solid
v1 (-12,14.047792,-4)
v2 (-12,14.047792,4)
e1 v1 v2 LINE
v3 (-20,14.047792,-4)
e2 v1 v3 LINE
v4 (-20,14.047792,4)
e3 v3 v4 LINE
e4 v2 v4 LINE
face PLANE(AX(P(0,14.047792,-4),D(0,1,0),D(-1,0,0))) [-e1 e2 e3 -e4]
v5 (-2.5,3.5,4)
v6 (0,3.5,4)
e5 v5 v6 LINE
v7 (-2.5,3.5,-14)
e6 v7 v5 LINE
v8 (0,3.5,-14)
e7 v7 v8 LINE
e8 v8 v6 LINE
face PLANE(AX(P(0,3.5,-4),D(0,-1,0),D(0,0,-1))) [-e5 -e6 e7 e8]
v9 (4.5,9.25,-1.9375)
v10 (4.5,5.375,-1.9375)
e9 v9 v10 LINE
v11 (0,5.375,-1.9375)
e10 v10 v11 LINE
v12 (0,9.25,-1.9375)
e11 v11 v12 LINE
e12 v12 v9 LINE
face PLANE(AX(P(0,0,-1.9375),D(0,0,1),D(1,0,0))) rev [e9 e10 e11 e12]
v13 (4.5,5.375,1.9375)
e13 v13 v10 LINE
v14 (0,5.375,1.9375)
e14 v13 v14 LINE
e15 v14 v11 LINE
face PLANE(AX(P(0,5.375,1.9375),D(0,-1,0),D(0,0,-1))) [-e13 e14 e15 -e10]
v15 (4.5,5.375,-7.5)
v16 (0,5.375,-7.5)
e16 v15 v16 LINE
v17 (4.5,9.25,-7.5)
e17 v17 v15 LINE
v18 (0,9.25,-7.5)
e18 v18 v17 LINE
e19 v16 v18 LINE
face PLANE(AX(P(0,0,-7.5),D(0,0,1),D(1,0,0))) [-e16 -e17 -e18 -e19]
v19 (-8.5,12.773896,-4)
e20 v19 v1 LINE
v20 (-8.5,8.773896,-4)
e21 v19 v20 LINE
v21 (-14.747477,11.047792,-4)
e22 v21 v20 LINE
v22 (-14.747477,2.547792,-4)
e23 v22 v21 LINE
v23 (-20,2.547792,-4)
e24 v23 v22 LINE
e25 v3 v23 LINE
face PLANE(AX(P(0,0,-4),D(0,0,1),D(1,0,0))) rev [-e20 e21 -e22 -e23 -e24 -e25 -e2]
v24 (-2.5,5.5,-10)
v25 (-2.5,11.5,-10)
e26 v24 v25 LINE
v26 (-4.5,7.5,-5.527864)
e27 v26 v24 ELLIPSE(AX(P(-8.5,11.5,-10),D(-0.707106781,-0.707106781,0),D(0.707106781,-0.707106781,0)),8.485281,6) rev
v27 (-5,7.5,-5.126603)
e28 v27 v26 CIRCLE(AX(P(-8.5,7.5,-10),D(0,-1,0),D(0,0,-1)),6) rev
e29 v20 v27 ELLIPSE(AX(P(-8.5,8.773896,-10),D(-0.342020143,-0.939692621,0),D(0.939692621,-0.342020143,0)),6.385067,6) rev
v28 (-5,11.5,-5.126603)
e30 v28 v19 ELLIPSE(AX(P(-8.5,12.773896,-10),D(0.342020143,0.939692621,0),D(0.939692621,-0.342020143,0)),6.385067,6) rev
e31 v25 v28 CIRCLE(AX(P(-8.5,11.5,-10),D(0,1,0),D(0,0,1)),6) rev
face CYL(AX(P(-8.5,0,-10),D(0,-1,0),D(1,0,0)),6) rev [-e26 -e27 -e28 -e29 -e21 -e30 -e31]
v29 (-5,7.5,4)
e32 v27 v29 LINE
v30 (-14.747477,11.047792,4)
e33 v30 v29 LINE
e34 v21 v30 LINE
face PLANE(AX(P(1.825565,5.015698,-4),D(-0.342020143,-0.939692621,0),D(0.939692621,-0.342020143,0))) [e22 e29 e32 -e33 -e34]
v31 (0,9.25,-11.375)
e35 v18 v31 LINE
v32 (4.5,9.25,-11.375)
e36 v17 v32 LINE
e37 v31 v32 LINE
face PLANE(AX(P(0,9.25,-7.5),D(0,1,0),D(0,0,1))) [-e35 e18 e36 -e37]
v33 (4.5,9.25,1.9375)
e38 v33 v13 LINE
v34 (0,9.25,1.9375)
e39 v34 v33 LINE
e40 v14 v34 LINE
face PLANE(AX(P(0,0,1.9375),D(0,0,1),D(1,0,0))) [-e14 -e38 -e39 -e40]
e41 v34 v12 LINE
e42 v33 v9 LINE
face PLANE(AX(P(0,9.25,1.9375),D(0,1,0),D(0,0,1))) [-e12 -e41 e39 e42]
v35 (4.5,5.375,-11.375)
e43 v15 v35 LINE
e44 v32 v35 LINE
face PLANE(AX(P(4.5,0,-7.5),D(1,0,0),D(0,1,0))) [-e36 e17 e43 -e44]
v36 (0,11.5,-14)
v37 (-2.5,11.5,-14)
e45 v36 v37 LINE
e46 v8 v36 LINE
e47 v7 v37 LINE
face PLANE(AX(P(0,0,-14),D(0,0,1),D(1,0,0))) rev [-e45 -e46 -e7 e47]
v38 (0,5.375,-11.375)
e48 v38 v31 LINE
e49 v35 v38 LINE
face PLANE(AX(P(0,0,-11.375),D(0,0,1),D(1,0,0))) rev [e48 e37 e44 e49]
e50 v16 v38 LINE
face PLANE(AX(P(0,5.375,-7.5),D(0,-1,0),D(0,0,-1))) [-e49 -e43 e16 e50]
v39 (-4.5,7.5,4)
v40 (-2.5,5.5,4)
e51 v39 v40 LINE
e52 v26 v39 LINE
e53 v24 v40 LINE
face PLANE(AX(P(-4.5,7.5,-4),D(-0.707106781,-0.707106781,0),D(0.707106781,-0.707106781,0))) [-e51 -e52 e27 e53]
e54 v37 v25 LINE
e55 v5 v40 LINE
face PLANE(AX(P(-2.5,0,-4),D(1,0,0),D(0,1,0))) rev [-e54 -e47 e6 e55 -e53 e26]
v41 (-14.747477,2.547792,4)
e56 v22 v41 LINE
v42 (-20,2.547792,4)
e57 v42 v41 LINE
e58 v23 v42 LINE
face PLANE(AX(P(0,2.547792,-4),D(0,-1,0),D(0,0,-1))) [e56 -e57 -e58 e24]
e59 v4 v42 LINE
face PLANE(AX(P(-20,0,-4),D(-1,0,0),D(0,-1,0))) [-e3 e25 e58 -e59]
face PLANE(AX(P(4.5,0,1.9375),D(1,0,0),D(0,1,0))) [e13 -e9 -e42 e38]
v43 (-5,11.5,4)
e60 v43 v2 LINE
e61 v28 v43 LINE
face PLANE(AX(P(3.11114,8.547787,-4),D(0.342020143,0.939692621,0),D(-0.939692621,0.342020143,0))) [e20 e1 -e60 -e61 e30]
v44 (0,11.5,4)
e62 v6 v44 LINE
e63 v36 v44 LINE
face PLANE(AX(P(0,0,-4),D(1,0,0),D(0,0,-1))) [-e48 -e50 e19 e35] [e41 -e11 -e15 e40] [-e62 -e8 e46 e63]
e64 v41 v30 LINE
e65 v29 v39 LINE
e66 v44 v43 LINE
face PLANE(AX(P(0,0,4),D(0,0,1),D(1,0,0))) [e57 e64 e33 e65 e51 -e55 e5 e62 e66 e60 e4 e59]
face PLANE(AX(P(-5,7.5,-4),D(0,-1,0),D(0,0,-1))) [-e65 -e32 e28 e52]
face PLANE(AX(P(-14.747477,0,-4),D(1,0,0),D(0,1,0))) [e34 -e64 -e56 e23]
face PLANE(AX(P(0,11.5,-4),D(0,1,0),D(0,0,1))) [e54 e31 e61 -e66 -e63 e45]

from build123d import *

# Parameters (mm, degrees)
SKETCH1_W           = 5.252522581
SKETCH1_H           = 8.5
BOSS_EXTRUDE1_DEPTH = 4
BOSS_EXTRUDE4_DEPTH = 14
SKETCH1_3_W         = 4.5
SKETCH1_3_H         = 3.875
BOSS_EXTRUDE2_DEPTH = 1.9375
BOSS_EXTRUDE5_START = -11.375
SKETCH1_8_W         = 4.5
SKETCH1_8_H         = 3.875
BOSS_EXTRUDE5_DEPTH = 3.875
FILLET1_R           = 6


with BuildPart() as part:
    # Sketch1 → Boss-Extrude1 (new, symmetric)
    with BuildSketch(Plane.XY):
        Polygon((-5, 7.5), (-4.5, 7.5), (-2.5, 5.5), (-2.5, 3.5), (0, 3.5), (0, 11.5), (-5, 11.5), align=None)
        Polygon((-20, 11.04779164), (-14.747477419, 11.04779164), (-5, 7.5), (-5, 11.5), (-12, 14.04779164), (-20, 14.04779164), align=None)
        with Locations((-17.373738709, 6.79779164)):
            Rectangle(SKETCH1_W, SKETCH1_H)
    extrude(amount=BOSS_EXTRUDE1_DEPTH, both=True)

    # Sketch1<7> → Boss-Extrude4 (add)
    with BuildSketch(Plane.XY):
        Polygon((-2.5, 3.5), (0, 3.5), (0, 5.375), (0, 9.25), (0, 11.5), (-2.5, 11.5), (-2.5, 5.5), align=None)
    extrude(amount=-BOSS_EXTRUDE4_DEPTH)

    # Sketch1<3> → Boss-Extrude2 (add, symmetric)
    with BuildSketch(Plane.XY):
        with Locations((2.25, 7.3125)):
            Rectangle(SKETCH1_3_W, SKETCH1_3_H)
    extrude(amount=BOSS_EXTRUDE2_DEPTH, both=True)

    # Sketch1<8> → Boss-Extrude5 (add)
    with BuildSketch(Plane.XY.offset(BOSS_EXTRUDE5_START)):
        with Locations((2.25, 7.3125)):
            Rectangle(SKETCH1_8_W, SKETCH1_8_H)
    extrude(amount=BOSS_EXTRUDE5_DEPTH)

    # Fillet1
    # the kernel refuses this fillet: 6 mm, written as the material it adds along each edge
    with BuildSketch(Plane(origin=(-2.5, 11.5, -4), x_dir=(-1, 0, 0), z_dir=(0, -1, 0))) as fillet1_piece_1_section:
        with BuildLine():
            CenterArc((FILLET1_R, FILLET1_R), FILLET1_R, 180, 90)
            Line((0, FILLET1_R), (0, 0))
            Line((0, 0), (FILLET1_R, 0))
        make_face()
    fillet1_piece_1 = extrude(amount=21, mode=Mode.PRIVATE)
    fillet1_piece_1 = split(fillet1_piece_1, bisect_by=Plane(origin=(-3.153811187, 10.828042225, -5.911199104), z_dir=(0.3420201433256695, 0.9396926207859081, 0)), keep=Keep.TOP, mode=Mode.PRIVATE)
    add(fillet1_piece_1)
    with BuildSketch(Plane(origin=(-2.5, 26.5, -4), x_dir=(-1, 0, 0), z_dir=(0, -1, 0))) as fillet1_piece_2_section:
        with BuildLine():
            CenterArc((FILLET1_R, FILLET1_R), FILLET1_R, 180, 90)
            Line((0, FILLET1_R), (0, 0))
            Line((0, 0), (FILLET1_R, 0))
        make_face()
    fillet1_piece_2 = extrude(amount=36, mode=Mode.PRIVATE)
    fillet1_piece_2 = split(fillet1_piece_2, bisect_by=Plane(origin=(-6.665111155, 12.106050897, -4.105232665), z_dir=(-0.3420201433256695, -0.9396926207859081, 0)), keep=Keep.TOP, mode=Mode.PRIVATE)
    fillet1_piece_2 = split(fillet1_piece_2, bisect_by=Plane(origin=(-6.768551784, 11.5, -4.105232665), z_dir=(0, 1, 0)), keep=Keep.TOP, mode=Mode.PRIVATE)
    add(fillet1_piece_2)
    with BuildSketch(Plane(origin=(-2.5, 11.5, -4), x_dir=(-1, 0, 0), z_dir=(0, -1, 0))) as fillet1_piece_3_section:
        with BuildLine():
            CenterArc((FILLET1_R, FILLET1_R), FILLET1_R, 180, 90)
            Line((0, FILLET1_R), (0, 0))
            Line((0, 0), (FILLET1_R, 0))
        make_face()
    fillet1_piece_3 = extrude(amount=21, mode=Mode.PRIVATE)
    fillet1_piece_3 = split(fillet1_piece_3, bisect_by=Plane(origin=(-3.734199971, 7.5, -5.388361027), z_dir=(0, 1, 0)), keep=Keep.TOP, mode=Mode.PRIVATE)
    fillet1_piece_3 = split(fillet1_piece_3, bisect_by=Plane(origin=(-3.190866328, 10.841529194, -5.388361027), z_dir=(-0.3420201433256695, -0.9396926207859081, 0)), keep=Keep.TOP, mode=Mode.PRIVATE)
    fillet1_piece_3 = split(fillet1_piece_3, bisect_by=Plane(origin=(-5.041466125, 8.041466125, -5.388361027), z_dir=(0.7071067811865476, 0.7071067811865476, 0)), keep=Keep.TOP, mode=Mode.PRIVATE)
    add(fillet1_piece_3)
    with BuildSketch(Plane(origin=(-2.5, 11.5, -4), x_dir=(-1, 0, 0), z_dir=(0, -1, 0))) as fillet1_piece_4_section:
        with BuildLine():
            CenterArc((FILLET1_R, FILLET1_R), FILLET1_R, 180, 90)
            Line((0, FILLET1_R), (0, 0))
            Line((0, 0), (FILLET1_R, 0))
        make_face()
    fillet1_piece_4 = extrude(amount=21, mode=Mode.PRIVATE)
    fillet1_piece_4 = split(fillet1_piece_4, bisect_by=Plane(origin=(-2.999537912, 7.5, -5.943273976), z_dir=(0, -1, 0)), keep=Keep.TOP, mode=Mode.PRIVATE)
    fillet1_piece_4 = split(fillet1_piece_4, bisect_by=Plane(origin=(-3.116705646, 6.814536913, -5.943273976), z_dir=(0.3420201433256692, 0.9396926207859082, 0)), keep=Keep.TOP, mode=Mode.PRIVATE)
    fillet1_piece_4 = split(fillet1_piece_4, bisect_by=Plane(origin=(-3.567995264, 6.567995264, -5.943273976), z_dir=(0.7071067811865476, 0.7071067811865476, 0)), keep=Keep.TOP, mode=Mode.PRIVATE)
    add(fillet1_piece_4)
    with BuildSketch(Plane(origin=(-2.5, 11.5, -4), x_dir=(-1, 0, 0), z_dir=(0, -1, 0))) as fillet1_piece_5_section:
        with BuildLine():
            CenterArc((FILLET1_R, FILLET1_R), FILLET1_R, 180, 90)
            Line((0, FILLET1_R), (0, 0))
            Line((0, 0), (FILLET1_R, 0))
        make_face()
    fillet1_piece_5 = extrude(amount=21, mode=Mode.PRIVATE)
    fillet1_piece_5 = split(fillet1_piece_5, bisect_by=Plane(origin=(-6.347942504, 7.5, -4.191885591), z_dir=(0, 1, 0)), keep=Keep.TOP, mode=Mode.PRIVATE)
    fillet1_piece_5 = split(fillet1_piece_5, bisect_by=Plane(origin=(-6.566870253, 8.070294133, -4.191885591), z_dir=(0.3420201433256692, 0.9396926207859082, 0)), keep=Keep.TOP, mode=Mode.PRIVATE)
    fillet1_piece_5 = split(fillet1_piece_5, bisect_by=Plane(origin=(-6.009867842, 9.009867842, -4.191885591), z_dir=(-0.7071067811865476, -0.7071067811865476, 0)), keep=Keep.TOP, mode=Mode.PRIVATE)
    add(fillet1_piece_5)
    with BuildSketch(Plane(origin=(-2.5, 11.5, -4), x_dir=(-1, 0, 0), z_dir=(0, -1, 0))) as fillet1_piece_6_section:
        with BuildLine():
            CenterArc((FILLET1_R, FILLET1_R), FILLET1_R, 180, 90)
            Line((0, FILLET1_R), (0, 0))
            Line((0, 0), (FILLET1_R, 0))
        make_face()
    fillet1_piece_6 = extrude(amount=21, mode=Mode.PRIVATE)
    fillet1_piece_6 = split(fillet1_piece_6, bisect_by=Plane(origin=(-2.735586813, 6.675821002, -6.085139246), z_dir=(-0.3420201433256692, -0.9396926207859082, 0)), keep=Keep.TOP, mode=Mode.PRIVATE)
    fillet1_piece_6 = split(fillet1_piece_6, bisect_by=Plane(origin=(-3.085930182, 6.085930182, -6.085139246), z_dir=(0.7071067811865476, 0.7071067811865476, 0)), keep=Keep.TOP, mode=Mode.PRIVATE)
    add(fillet1_piece_6)


solid = part.part
